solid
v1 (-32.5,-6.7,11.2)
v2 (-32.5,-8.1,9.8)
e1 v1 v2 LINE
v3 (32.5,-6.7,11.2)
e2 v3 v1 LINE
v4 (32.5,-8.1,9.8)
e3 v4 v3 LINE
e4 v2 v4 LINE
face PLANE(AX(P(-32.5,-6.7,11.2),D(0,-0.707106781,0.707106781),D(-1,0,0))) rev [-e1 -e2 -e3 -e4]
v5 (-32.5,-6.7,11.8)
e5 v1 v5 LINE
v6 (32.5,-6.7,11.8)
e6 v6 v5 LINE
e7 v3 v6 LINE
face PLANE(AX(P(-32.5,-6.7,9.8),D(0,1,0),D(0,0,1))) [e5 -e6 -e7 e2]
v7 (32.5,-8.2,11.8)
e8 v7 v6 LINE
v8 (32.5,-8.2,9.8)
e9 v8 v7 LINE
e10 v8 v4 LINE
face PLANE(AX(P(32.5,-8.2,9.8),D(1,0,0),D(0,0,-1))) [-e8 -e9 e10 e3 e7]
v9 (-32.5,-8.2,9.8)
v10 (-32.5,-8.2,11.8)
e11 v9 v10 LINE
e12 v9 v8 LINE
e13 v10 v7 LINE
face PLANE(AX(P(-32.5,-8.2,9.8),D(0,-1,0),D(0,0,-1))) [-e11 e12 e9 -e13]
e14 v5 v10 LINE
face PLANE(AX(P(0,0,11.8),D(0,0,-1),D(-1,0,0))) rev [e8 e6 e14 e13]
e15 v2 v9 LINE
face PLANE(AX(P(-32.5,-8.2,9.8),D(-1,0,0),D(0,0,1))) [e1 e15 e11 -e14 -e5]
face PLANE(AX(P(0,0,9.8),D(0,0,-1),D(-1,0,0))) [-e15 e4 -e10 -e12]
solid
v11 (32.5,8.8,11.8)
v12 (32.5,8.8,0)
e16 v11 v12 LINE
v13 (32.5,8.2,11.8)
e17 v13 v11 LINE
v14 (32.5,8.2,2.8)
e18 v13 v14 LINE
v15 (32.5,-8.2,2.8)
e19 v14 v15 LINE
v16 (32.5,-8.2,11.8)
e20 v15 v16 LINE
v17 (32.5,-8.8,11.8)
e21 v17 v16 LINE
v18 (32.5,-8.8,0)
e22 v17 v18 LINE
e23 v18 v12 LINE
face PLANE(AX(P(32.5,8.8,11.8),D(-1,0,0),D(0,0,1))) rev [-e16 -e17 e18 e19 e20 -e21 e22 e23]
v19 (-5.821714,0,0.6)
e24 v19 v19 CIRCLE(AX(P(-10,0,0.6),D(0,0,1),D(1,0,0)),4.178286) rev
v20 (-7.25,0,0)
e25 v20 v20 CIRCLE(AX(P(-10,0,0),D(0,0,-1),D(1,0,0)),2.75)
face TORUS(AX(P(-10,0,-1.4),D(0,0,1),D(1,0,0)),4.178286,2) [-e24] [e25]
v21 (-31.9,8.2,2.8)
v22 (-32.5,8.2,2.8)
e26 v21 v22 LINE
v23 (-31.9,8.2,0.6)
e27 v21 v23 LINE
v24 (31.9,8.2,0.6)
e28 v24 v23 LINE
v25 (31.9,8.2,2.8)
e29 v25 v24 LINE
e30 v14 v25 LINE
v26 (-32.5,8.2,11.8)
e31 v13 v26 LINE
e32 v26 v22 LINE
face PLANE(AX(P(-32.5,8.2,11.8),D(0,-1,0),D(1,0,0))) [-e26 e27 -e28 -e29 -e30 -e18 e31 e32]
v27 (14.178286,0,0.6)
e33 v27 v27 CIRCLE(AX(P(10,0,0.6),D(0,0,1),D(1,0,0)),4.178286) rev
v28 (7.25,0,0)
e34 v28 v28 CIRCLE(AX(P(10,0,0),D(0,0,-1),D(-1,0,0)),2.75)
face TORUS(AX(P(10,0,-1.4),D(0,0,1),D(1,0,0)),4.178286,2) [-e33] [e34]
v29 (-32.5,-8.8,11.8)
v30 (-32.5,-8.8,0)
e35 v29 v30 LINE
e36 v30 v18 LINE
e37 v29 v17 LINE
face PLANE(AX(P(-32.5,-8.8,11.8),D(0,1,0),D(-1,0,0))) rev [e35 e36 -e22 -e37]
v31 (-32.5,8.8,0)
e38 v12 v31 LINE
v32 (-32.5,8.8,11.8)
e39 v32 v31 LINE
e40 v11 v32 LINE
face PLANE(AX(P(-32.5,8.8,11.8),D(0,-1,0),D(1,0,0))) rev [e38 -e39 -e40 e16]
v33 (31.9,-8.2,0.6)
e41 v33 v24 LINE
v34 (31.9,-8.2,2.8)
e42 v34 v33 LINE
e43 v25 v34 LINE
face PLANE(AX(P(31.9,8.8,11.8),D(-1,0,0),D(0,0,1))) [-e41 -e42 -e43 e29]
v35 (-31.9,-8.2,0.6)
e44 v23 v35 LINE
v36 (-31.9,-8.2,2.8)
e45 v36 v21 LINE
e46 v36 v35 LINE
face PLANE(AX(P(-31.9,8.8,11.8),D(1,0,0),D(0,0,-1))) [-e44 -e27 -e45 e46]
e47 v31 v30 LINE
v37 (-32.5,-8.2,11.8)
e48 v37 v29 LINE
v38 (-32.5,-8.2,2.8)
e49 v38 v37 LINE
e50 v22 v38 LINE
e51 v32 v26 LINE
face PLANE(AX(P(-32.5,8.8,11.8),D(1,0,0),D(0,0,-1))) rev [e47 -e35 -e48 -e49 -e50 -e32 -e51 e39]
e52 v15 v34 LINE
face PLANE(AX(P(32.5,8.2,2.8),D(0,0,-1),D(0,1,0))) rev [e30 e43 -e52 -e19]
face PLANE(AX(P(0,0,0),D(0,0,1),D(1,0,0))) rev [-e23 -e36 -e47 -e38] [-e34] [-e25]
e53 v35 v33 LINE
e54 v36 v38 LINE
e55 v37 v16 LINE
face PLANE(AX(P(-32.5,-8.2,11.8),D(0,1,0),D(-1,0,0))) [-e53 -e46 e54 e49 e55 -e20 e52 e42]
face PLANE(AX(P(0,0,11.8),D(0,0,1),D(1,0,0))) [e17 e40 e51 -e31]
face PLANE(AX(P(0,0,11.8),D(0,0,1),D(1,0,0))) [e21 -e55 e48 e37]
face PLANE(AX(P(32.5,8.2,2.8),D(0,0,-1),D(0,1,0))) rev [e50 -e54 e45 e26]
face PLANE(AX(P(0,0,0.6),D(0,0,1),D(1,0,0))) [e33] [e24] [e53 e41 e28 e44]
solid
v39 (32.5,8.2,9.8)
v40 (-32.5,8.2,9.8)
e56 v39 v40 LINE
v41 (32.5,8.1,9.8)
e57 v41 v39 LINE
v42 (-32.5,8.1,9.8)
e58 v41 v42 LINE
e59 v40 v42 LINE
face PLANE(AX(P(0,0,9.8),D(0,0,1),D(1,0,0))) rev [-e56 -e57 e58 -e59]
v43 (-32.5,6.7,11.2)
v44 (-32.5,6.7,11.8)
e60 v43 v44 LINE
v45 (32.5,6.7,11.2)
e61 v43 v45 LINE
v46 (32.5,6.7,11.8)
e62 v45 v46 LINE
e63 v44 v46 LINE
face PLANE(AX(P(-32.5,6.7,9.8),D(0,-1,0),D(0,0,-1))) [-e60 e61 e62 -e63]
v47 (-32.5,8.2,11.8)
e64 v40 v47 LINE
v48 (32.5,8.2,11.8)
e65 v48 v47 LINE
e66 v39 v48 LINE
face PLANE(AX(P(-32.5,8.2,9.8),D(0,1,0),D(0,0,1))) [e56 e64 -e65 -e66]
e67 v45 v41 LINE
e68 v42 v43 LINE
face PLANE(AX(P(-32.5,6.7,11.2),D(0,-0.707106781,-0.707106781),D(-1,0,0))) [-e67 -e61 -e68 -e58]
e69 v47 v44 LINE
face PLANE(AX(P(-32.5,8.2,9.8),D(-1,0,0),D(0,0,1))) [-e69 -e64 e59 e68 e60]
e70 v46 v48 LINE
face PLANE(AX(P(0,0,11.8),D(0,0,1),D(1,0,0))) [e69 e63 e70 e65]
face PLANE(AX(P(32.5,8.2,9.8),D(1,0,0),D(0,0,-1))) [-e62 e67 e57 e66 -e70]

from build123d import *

# Parameters (mm, degrees)
SKETCH1_W             = 65
SKETCH1_H             = 17.6
BOSS_EXTRUDE1_DEPTH   = 11.8
SHELL1_T              = -0.6
SKETCH2_W             = 9
SKETCH2_H             = 16.4
CUT_EXTRUDE1_DEPTH    = 67.645930108
SKETCH3_W             = 65
SKETCH3_H             = 1.5
BOSS_EXTRUDE2_DEPTH   = 2
BOSS_EXTRUDE2_2_DEPTH = 2
CHAMFER1_SIZE         = 1.4
CHAMFER2_SIZE         = 1.4
SKETCH4_R             = 2.75
CUT_EXTRUDE2_DEPTH    = 3
FILLET2_R             = 2


with BuildPart() as part:
    # Sketch1 → Boss-Extrude1 (new body)
    with BuildSketch(Plane.XY):
        Rectangle(SKETCH1_W, SKETCH1_H)
    extrude(amount=BOSS_EXTRUDE1_DEPTH)

    # Shell1
    shell1_openings = [part.faces().sort_by_distance(p)[0] for p in [
        (0, 0, 11.8),
    ]]
    offset(amount=SHELL1_T, openings=shell1_openings, kind=Kind.INTERSECTION)

    # Sketch2 → Cut-Extrude1 (cut, through all)
    with BuildSketch(Plane.ZY.offset(32.5)):
        with Locations((7.3, 0)):
            Rectangle(SKETCH2_W, SKETCH2_H)
    extrude(amount=-CUT_EXTRUDE1_DEPTH, mode=Mode.SUBTRACT)

    # Sketch4 → Cut-Extrude2 (cut)
    with BuildSketch(Plane(origin=(0, 0, 0), x_dir=(-1, 0, 0), z_dir=(0, 0, -1))):
        with Locations((-10, 0)):
            Circle(SKETCH4_R)
        with Locations(Location((10, 0, 0), (0, 0, 180))):
            Circle(SKETCH4_R)
    extrude(amount=-CUT_EXTRUDE2_DEPTH, mode=Mode.SUBTRACT)

    # Fillet2
    # the kernel refuses this fillet: 2 mm, written as the material it takes off along each edge
    with BuildSketch(Plane(origin=(10, 0, 0.6), x_dir=(-1, 0, 0), z_dir=(0, -1, 0))) as fillet2_piece_1:
        with BuildLine():
            CenterArc((4.178285686, 2), FILLET2_R, 224.427004001, 45.572995999)
            Line((4.178285686, 0), (4.178285686, -0.04))
            Line((4.178285686, -0.04), (2.75, -0.04))
            Line((2.75, -0.04), (2.71, 0))
            ThreePointArc((2.71, 0), (2.71, 0.3), (2.721434286, 0.572))
            Line((2.721434286, 0.572), (2.75, 0.6))
        make_face()
    revolve(axis=Axis((10, 0, 0.6), (0, 0, -1)), mode=Mode.SUBTRACT)
    with BuildSketch(Plane(origin=(-10, 0, 0.6), x_dir=(1, 0, 0), z_dir=(0, 1, 0))) as fillet2_piece_2:
        with BuildLine():
            CenterArc((4.178285686, 2), FILLET2_R, 224.427004001, 45.572995999)
            Line((4.178285686, 0), (4.178285686, -0.04))
            Line((4.178285686, -0.04), (2.75, -0.04))
            Line((2.75, -0.04), (2.71, 0))
            ThreePointArc((2.71, 0), (2.71, 0.3), (2.721434286, 0.572))
            Line((2.721434286, 0.572), (2.75, 0.6))
        make_face()
    revolve(axis=Axis((-10, 0, 0.6), (0, 0, -1)), mode=Mode.SUBTRACT)


with BuildPart() as body_2:
    # Sketch3 → Boss-Extrude2 (new body)
    with BuildSketch(Plane.XY.offset(11.8)):
        with Locations((0, 7.45)):
            Rectangle(SKETCH3_W, SKETCH3_H)
    extrude(amount=-BOSS_EXTRUDE2_DEPTH)

    # Chamfer1
    chamfer1_edges = [body_2.edges().sort_by_distance(p)[0] for p in [
        (0, 6.7, 9.8),
    ]]
    chamfer(chamfer1_edges, length=CHAMFER1_SIZE)


with BuildPart() as body_3:
    # Sketch3 → Boss-Extrude2 2 (new body)
    with BuildSketch(Plane.XY.offset(11.8)):
        with Locations((0, -7.45)):
            Rectangle(SKETCH3_W, SKETCH3_H)
    extrude(amount=-BOSS_EXTRUDE2_2_DEPTH)

    # Chamfer2
    chamfer2_edges = [body_3.edges().sort_by_distance(p)[0] for p in [
        (0, -6.7, 9.8),
    ]]
    chamfer(chamfer2_edges, length=CHAMFER2_SIZE)


solid = Compound([part.part, body_2.part, body_3.part])
